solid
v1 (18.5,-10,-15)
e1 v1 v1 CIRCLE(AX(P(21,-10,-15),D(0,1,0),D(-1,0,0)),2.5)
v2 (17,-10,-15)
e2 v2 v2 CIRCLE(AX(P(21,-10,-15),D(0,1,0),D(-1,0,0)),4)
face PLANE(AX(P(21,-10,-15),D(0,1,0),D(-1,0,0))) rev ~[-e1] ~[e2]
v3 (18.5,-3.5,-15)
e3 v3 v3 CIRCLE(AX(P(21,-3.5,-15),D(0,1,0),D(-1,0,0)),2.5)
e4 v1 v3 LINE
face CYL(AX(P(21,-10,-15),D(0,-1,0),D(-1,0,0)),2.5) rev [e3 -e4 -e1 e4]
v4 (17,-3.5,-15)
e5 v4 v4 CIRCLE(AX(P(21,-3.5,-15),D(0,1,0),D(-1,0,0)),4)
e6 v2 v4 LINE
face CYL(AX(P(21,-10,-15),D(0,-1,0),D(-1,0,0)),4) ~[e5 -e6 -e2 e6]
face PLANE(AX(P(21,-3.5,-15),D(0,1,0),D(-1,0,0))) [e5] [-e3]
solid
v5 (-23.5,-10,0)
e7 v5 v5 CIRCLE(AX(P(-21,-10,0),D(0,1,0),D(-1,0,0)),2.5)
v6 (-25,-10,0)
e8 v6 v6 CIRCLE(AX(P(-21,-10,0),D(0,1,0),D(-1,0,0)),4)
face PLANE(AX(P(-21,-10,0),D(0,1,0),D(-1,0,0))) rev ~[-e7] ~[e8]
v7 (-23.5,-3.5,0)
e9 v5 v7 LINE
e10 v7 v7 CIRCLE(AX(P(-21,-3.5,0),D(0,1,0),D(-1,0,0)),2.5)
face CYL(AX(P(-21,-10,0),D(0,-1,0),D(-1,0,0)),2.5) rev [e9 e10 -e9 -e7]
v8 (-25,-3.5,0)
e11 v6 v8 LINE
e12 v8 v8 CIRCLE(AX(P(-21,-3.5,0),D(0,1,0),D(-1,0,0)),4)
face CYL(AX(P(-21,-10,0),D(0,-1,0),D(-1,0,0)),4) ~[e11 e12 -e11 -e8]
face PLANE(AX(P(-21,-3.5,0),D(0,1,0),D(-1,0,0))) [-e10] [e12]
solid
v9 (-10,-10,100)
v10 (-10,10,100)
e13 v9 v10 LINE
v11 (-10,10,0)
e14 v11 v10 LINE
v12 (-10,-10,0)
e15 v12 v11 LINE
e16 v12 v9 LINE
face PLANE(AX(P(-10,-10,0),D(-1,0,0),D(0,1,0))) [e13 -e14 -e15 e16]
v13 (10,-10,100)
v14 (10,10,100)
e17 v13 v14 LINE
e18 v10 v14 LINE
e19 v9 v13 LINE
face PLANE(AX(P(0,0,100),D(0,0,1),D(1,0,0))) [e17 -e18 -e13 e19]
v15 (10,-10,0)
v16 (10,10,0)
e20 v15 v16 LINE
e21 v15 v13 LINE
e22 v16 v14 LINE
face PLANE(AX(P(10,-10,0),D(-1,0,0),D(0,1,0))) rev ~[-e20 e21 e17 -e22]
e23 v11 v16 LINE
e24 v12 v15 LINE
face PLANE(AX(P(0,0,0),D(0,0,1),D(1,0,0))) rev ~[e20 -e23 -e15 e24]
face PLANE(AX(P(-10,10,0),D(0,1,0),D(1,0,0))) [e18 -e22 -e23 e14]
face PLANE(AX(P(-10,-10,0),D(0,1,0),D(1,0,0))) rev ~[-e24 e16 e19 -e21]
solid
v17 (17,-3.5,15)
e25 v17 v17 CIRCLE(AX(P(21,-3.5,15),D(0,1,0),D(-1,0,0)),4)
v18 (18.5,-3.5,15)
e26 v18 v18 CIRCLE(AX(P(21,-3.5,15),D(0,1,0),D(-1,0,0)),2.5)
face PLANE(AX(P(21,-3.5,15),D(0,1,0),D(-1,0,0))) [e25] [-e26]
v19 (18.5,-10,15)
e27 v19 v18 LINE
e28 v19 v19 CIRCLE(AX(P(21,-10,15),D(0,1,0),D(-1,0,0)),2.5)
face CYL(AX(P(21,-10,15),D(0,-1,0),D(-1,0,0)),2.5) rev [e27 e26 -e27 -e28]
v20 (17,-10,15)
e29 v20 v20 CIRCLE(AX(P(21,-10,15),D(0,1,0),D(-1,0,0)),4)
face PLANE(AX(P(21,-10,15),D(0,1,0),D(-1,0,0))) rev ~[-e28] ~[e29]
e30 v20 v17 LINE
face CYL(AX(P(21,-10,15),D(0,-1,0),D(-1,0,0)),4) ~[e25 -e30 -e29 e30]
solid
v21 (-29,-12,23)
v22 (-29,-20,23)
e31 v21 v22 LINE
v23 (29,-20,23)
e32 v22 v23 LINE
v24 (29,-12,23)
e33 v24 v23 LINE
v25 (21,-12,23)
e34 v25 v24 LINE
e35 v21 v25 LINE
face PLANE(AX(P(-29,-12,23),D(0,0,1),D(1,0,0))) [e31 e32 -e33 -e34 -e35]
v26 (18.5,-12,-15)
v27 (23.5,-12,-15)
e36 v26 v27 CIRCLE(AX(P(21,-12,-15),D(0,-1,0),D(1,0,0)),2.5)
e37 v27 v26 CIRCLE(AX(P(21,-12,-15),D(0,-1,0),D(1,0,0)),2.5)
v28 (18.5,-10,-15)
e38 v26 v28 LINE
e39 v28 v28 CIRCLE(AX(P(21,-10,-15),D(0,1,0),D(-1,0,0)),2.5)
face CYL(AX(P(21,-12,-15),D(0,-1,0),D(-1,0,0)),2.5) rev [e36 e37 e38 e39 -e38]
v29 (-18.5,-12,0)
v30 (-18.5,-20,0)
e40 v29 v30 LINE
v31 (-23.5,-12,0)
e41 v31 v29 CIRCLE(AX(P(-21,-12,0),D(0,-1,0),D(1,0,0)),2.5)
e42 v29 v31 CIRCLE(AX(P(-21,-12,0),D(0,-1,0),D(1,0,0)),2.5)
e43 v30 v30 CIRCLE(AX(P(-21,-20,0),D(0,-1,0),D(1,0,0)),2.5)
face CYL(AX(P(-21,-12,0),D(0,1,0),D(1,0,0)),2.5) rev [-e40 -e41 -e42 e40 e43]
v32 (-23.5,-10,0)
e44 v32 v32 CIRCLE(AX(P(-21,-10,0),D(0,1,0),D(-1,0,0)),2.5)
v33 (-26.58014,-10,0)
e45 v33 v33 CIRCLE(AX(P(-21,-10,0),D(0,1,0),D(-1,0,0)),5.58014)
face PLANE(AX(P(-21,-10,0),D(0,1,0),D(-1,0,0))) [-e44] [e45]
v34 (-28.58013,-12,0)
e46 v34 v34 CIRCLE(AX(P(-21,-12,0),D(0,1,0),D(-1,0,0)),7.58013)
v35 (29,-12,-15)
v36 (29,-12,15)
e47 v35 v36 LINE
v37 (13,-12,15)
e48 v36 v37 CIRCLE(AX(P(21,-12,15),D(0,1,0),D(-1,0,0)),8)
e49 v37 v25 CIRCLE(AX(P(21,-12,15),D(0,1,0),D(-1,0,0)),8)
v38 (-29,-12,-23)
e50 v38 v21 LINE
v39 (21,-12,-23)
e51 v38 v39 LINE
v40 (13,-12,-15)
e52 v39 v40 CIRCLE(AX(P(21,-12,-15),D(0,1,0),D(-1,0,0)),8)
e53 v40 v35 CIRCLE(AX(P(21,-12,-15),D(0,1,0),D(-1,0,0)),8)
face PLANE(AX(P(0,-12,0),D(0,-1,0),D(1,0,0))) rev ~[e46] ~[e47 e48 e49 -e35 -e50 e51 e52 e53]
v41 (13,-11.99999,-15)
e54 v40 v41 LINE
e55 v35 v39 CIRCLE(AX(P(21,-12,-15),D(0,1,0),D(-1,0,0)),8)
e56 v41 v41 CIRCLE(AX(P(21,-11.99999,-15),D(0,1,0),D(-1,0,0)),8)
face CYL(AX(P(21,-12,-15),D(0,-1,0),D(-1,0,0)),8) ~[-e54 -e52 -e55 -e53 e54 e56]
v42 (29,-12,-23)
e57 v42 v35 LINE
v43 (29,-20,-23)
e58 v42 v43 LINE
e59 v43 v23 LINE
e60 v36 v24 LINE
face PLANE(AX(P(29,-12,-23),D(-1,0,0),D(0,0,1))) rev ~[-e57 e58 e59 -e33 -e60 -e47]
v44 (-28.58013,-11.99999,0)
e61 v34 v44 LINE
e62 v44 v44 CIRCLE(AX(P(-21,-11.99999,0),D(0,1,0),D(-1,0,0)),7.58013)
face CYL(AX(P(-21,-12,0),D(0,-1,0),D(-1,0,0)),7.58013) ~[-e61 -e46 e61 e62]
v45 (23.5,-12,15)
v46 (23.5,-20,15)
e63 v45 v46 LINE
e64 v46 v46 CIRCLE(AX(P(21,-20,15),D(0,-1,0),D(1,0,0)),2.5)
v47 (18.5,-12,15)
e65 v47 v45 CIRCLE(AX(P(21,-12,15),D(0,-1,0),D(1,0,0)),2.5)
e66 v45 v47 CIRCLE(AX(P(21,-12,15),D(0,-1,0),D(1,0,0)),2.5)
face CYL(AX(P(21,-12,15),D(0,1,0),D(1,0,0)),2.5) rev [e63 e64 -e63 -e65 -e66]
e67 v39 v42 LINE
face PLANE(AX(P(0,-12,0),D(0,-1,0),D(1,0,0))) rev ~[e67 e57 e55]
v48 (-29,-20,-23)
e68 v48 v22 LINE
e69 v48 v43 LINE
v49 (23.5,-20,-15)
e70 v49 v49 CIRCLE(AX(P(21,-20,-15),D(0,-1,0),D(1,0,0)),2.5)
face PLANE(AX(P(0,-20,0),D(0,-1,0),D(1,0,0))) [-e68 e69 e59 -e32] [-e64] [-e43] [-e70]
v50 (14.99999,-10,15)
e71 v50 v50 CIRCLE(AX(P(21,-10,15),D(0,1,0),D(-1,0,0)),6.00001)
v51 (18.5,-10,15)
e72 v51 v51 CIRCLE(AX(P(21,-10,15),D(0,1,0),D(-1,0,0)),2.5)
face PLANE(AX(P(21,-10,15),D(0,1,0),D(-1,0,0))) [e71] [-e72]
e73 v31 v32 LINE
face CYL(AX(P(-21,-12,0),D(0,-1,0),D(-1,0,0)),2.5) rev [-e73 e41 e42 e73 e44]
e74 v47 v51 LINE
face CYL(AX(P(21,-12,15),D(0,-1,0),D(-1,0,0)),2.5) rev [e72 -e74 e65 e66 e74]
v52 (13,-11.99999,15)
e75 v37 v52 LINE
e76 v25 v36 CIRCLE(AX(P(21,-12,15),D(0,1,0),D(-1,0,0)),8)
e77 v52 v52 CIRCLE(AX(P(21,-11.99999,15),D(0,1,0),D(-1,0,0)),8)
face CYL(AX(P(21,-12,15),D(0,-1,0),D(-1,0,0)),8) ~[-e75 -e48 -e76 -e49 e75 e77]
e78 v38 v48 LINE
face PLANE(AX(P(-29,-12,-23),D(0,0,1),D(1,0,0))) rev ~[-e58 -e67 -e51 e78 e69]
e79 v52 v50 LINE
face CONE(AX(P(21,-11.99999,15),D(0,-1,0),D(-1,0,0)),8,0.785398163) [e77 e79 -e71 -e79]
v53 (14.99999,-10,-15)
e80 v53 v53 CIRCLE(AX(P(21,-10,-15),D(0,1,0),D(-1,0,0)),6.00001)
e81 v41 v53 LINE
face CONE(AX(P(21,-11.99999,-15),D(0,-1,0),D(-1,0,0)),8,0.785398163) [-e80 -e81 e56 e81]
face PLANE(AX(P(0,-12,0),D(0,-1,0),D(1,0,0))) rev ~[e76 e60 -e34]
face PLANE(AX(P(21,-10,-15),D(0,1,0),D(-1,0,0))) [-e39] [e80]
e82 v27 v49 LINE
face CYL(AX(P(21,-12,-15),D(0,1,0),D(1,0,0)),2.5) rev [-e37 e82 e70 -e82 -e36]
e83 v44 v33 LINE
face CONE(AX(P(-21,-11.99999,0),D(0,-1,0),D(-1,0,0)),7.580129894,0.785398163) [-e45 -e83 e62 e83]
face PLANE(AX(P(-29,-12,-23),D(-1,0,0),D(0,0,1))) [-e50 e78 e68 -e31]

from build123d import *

# Parameters (mm, degrees)
F1_W     = 20
F1_H     = 20
F2_DEPTH = 100
F3_W     = 58
F3_H     = 46
F3_R     = 2.5
F4_DEPTH = 8
F5_R     = 8
F5_R_2   = 2.5
F5_R_3   = 7.5801298939
F6_DEPTH = 2
F7_SIZE  = 1.99999
F8_R     = 4
F8_R_2   = 2.5
F9_DEPTH = 6.5


# Not quite as in the source:
# - a fillet or chamfer is up to 0.001 mm smaller than in the source, because OpenCascade refuses the exact size


with BuildPart() as f2:
    # F1 (on Top) → F2 (new body)
    with BuildSketch(Plane.XY):
        Rectangle(F1_W, F1_H)
    extrude(amount=F2_DEPTH)


with BuildPart() as f4:
    # F3 (on offset) → F4 (new body)
    with BuildSketch(Plane.XZ.offset(12)):
        Rectangle(F3_W, F3_H)
        with Locations((21, -15)):
            Circle(F3_R, mode=Mode.SUBTRACT)
        with Locations((-21, 0)):
            Circle(F3_R, mode=Mode.SUBTRACT)
        with Locations((21, 15)):
            Circle(F3_R, mode=Mode.SUBTRACT)
    extrude(amount=F4_DEPTH)

    # F5 (on face) → F6 (join)
    with BuildSketch(Plane(origin=(0, -12, 0), x_dir=(-1, 0, 0), z_dir=(0, 1, 0))):
        with Locations((-21, 15)):
            Circle(F5_R)
        with Locations((-21, 15)):
            Circle(F5_R_2, mode=Mode.SUBTRACT)
        with Locations((-21, -15)):
            Circle(F5_R)
        with Locations((-21, -15)):
            Circle(F5_R_2, mode=Mode.SUBTRACT)
        with Locations((21, 0)):
            Circle(F5_R_3)
        with Locations((21, 0)):
            Circle(F5_R_2, mode=Mode.SUBTRACT)
    extrude(amount=F6_DEPTH)

    # F7 (size 2 in the source; OpenCascade refuses exactly that, so slightly less here)
    f7_edges = [f4.edges().sort_by_distance(p)[0] for p in [
        (29, -10, 15),
        (-13.41987, -10, 0),
        (29, -10, -15),
    ]]
    chamfer(f7_edges, length=F7_SIZE)


with BuildPart() as f9:
    # F8 (on face) → F9 (new body)
    with BuildSketch(Plane(origin=(0, -10, 0), x_dir=(-1, 0, 0), z_dir=(0, 1, 0))):
        with Locations((-21, 15)):
            Circle(F8_R)
        with Locations((-21, 15)):
            Circle(F8_R_2, mode=Mode.SUBTRACT)
    extrude(amount=F9_DEPTH)


with BuildPart() as f9b:
    # F8 (on face) → F9, piece 2 (new body)
    with BuildSketch(Plane(origin=(0, -10, 0), x_dir=(-1, 0, 0), z_dir=(0, 1, 0))):
        with Locations((21, 0)):
            Circle(F8_R)
        with Locations((21, 0)):
            Circle(F8_R_2, mode=Mode.SUBTRACT)
    extrude(amount=F9_DEPTH)


with BuildPart() as f9c:
    # F8 (on face) → F9, piece 3 (new body)
    with BuildSketch(Plane(origin=(0, -10, 0), x_dir=(-1, 0, 0), z_dir=(0, 1, 0))):
        with Locations((-21, -15)):
            Circle(F8_R)
        with Locations((-21, -15)):
            Circle(F8_R_2, mode=Mode.SUBTRACT)
    extrude(amount=F9_DEPTH)


solid = Compound([f2.part, f4.part, f9.part, f9b.part, f9c.part])
